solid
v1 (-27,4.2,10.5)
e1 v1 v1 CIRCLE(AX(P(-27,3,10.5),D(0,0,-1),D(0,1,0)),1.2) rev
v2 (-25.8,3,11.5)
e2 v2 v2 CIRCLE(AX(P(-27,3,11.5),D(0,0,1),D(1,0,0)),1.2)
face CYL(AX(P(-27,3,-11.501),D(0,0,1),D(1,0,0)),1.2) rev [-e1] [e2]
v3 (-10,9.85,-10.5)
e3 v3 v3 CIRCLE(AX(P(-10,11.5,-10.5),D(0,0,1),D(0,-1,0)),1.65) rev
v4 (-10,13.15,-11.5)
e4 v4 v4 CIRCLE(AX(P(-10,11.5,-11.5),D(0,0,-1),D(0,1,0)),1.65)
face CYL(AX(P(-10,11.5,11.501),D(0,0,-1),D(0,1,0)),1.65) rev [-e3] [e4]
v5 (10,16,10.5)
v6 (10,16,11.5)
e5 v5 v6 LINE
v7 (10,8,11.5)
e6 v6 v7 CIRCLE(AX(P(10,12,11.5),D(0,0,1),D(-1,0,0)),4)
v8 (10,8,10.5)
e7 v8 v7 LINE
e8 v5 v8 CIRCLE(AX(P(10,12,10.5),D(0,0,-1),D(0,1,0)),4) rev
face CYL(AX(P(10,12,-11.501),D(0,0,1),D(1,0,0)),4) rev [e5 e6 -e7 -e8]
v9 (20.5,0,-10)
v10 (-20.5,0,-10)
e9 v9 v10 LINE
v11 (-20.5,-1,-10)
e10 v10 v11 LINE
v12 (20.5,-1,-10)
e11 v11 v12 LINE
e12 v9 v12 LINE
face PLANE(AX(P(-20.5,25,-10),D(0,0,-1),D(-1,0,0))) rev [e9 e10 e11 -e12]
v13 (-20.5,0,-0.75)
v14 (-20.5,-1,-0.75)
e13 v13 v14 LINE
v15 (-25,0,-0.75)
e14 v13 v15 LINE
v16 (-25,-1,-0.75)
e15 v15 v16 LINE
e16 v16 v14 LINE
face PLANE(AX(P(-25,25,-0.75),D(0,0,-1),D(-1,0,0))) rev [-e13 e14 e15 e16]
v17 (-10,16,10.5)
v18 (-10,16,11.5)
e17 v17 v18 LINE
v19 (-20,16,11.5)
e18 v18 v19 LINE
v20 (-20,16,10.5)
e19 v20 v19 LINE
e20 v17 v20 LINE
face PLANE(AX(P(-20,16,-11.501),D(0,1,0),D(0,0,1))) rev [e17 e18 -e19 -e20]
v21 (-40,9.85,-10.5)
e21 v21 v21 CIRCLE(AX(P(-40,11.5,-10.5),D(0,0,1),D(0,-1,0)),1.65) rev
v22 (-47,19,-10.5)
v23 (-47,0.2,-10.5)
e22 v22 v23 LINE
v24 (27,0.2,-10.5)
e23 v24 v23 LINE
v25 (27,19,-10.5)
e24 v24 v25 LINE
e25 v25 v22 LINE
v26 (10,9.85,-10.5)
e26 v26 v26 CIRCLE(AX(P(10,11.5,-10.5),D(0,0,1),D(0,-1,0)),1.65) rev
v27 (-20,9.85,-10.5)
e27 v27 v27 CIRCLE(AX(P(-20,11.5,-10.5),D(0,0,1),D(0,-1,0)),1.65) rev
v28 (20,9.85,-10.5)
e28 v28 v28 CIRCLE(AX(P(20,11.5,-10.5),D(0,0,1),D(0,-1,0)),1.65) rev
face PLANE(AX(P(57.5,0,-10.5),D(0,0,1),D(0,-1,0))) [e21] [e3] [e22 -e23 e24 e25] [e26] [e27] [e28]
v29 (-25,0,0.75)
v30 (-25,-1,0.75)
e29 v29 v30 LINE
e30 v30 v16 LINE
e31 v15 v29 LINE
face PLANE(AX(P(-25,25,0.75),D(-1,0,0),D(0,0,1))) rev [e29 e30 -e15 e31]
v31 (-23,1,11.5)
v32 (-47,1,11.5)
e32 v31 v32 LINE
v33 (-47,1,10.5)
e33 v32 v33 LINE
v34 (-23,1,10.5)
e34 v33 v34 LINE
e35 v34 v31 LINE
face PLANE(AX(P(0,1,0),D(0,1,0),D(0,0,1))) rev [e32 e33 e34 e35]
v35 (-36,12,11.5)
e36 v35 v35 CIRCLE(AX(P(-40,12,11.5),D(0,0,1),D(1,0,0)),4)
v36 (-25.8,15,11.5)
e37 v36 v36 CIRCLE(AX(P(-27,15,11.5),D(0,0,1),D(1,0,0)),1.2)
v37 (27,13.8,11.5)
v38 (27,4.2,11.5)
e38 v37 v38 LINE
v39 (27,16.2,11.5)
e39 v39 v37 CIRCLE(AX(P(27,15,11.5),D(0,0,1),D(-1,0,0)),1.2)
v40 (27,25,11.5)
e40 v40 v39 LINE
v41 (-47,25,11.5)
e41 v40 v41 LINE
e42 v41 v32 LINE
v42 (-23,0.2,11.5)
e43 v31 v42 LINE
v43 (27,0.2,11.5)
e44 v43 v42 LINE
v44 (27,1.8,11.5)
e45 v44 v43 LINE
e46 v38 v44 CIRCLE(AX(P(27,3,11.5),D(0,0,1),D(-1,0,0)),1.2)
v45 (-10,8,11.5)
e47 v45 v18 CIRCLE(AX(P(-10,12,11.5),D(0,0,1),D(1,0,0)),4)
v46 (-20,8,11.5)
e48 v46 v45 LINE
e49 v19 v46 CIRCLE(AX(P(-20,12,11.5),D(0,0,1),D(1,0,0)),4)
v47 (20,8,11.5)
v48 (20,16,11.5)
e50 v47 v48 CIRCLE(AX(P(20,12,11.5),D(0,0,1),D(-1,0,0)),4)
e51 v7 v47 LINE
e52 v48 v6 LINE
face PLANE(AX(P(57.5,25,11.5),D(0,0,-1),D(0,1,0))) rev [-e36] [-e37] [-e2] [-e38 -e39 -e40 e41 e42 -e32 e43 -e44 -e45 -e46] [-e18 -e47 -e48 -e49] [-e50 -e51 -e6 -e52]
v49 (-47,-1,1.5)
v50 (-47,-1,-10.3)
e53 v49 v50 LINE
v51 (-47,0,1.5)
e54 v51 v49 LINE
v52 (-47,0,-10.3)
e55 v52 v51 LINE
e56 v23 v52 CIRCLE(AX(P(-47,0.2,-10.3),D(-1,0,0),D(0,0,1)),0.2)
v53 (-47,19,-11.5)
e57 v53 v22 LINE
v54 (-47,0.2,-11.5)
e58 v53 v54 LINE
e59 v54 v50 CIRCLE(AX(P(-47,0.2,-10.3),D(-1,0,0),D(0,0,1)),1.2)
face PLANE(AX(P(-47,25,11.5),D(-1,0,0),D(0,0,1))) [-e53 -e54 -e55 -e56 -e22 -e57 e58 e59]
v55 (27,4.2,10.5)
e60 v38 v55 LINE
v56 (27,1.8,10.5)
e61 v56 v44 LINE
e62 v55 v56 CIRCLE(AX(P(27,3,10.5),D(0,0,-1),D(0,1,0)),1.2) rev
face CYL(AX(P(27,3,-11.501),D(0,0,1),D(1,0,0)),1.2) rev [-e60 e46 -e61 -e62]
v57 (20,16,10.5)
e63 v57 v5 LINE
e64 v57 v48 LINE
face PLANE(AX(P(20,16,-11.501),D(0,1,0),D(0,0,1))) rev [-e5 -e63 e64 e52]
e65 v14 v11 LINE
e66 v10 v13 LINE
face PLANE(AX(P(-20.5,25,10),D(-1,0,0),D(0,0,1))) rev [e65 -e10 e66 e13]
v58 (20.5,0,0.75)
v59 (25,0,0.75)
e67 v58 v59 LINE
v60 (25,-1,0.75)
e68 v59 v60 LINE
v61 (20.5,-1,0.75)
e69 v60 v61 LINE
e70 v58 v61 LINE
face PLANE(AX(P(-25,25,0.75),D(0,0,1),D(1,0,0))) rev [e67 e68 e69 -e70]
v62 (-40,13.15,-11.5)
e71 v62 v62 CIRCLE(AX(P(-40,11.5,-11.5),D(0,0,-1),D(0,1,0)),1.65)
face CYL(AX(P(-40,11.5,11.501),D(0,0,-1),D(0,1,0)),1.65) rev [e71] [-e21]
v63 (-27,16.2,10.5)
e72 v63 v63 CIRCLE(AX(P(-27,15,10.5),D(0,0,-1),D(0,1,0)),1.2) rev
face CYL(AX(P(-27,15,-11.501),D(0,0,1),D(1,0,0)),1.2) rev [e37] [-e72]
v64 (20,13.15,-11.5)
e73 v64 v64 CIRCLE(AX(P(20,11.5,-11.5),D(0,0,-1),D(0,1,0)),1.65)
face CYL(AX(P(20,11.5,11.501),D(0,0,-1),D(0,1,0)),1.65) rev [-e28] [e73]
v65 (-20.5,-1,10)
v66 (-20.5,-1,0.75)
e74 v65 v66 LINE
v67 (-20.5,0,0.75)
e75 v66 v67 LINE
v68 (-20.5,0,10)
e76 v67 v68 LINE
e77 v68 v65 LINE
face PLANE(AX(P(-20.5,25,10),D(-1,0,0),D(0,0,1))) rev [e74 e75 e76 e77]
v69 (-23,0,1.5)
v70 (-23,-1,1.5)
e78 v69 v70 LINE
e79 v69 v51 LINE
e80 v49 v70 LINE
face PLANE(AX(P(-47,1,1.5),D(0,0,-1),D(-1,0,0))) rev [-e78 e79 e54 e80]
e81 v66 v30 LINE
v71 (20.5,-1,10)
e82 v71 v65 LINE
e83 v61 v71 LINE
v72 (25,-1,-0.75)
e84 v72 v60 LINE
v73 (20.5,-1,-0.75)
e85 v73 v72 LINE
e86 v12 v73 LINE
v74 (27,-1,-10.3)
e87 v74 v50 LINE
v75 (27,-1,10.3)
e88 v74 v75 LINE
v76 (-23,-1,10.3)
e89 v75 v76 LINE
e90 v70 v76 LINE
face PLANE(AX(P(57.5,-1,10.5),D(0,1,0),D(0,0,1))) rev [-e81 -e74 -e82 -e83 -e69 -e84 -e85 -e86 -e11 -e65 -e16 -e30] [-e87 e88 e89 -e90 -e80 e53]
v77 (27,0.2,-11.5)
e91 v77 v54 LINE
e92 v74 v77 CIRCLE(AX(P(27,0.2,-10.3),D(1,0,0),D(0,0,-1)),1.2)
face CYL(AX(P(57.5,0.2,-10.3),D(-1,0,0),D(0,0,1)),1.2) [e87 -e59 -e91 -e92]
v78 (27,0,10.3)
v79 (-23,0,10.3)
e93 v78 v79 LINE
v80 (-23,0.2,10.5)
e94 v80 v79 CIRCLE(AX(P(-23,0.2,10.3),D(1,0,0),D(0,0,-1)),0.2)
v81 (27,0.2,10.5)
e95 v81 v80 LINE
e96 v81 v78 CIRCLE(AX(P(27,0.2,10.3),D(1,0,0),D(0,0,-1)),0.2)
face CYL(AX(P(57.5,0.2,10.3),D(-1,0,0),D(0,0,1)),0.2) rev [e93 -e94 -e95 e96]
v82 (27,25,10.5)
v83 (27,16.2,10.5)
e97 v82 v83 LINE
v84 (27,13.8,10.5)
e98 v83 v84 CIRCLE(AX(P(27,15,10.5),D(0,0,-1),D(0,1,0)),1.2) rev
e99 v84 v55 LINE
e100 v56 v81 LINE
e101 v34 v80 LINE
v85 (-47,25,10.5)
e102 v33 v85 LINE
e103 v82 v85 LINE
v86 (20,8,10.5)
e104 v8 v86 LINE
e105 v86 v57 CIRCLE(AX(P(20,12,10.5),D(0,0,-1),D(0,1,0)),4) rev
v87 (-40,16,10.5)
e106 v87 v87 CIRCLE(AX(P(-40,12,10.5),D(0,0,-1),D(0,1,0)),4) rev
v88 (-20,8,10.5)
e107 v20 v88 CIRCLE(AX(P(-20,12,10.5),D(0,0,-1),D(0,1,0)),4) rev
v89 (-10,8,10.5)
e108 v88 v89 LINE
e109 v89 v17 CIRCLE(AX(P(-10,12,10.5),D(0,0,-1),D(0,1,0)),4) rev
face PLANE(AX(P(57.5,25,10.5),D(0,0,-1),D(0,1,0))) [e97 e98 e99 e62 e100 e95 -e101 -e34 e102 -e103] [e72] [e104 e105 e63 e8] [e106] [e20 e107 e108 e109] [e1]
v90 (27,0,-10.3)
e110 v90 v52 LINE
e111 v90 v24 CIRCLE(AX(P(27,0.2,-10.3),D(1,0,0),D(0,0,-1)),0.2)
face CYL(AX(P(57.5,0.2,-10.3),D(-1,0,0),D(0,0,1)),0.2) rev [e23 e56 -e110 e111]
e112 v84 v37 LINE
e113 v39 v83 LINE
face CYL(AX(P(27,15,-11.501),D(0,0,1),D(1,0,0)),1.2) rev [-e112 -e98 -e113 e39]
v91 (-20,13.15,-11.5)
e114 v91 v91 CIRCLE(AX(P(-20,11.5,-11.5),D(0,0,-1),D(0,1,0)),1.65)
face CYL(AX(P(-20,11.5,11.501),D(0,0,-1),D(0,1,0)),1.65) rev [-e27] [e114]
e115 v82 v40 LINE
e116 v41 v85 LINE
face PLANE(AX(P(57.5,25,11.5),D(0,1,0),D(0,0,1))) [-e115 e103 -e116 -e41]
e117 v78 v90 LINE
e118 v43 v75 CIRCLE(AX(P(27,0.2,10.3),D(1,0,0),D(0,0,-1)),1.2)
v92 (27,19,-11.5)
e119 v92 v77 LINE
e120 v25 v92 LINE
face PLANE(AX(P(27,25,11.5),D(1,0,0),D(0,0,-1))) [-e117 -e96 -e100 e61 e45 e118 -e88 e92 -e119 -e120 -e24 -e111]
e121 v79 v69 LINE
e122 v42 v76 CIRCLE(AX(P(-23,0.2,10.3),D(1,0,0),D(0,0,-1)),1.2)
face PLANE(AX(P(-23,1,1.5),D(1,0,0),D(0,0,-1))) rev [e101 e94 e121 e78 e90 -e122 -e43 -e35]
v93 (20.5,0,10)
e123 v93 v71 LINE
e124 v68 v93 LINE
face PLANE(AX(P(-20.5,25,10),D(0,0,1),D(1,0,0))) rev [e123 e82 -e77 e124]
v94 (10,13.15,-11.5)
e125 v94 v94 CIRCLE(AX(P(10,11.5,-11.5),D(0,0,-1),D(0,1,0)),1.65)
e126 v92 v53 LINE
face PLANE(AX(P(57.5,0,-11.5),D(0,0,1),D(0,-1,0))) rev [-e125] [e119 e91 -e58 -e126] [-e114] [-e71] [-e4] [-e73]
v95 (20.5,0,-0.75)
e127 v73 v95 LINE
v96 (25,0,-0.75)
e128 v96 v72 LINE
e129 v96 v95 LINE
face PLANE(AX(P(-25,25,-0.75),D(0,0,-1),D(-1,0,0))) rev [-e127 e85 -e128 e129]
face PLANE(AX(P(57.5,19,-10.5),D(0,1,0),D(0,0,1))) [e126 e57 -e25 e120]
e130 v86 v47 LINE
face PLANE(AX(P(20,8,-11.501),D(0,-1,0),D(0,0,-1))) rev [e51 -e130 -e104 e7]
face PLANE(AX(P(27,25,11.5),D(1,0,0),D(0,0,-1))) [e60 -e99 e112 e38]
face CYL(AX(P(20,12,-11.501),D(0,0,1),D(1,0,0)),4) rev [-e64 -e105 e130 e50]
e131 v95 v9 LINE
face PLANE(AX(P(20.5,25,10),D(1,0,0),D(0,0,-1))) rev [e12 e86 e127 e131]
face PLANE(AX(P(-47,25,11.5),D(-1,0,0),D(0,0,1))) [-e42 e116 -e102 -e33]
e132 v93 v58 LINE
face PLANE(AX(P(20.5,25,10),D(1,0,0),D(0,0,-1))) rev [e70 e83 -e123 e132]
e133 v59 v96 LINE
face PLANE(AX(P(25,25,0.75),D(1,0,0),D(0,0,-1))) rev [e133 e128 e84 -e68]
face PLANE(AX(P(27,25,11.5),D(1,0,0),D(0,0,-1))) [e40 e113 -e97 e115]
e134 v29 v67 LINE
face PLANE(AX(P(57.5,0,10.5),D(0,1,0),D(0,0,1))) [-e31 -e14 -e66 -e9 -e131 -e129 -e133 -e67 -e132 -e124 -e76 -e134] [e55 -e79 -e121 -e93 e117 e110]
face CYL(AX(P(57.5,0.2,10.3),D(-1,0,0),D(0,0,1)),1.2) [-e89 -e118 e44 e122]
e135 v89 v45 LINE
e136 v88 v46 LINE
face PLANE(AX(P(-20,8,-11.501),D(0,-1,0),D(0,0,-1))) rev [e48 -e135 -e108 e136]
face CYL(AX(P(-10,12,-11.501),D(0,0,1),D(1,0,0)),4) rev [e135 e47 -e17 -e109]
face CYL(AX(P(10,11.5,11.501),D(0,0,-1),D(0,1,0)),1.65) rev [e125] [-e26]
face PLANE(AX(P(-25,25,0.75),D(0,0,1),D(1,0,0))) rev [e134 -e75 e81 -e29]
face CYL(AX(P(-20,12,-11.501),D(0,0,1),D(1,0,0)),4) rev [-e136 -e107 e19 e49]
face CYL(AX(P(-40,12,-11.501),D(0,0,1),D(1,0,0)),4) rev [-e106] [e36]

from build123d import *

# Parameters (mm, degrees)
FESTPLATTENBLECH_SCHNITT_LINEAR_START        = -14.177516002
FESTPLATTENBLECH_SCHNITT_LINEAR_AU_2_W       = 115
FESTPLATTENBLECH_SCHNITT_LINEAR_AU_2_H       = 1
FESTPLATTENBLECH_SCHNITT_LINEAR_AUSTRA_DEPTH = 20.6
FESTPLATTENBLECH_SCHNITT_LINEAR_START_2      = 6.622483998
FESTPLATTENBLECH_SCHNITT_LINEAR_AU_3_O_W     = 115
FESTPLATTENBLECH_SCHNITT_LINEAR_AU_3_O_H     = 6
FESTPLATTENBLECH_SCHNITT_LINEAR_AU_3_DEPTH   = 1
FESTPLATTENBLECH_SCHNITT_LINEAR_START_3      = -15.377516002
FESTPLATTENBLECH_SCHNITT_LINEAR_AU_4_O_R     = 4
FESTPLATTENBLECH_SCHNITT_LINEAR_AU_4_O_R_2   = 1.65
FESTPLATTENBLECH_SCHNITT_LINEAR_AU_4_O_R_3   = 1.2
FESTPLATTENBLECH_SCHNITT_LINEAR_AU_4_DEPTH   = 1
FESTPLATTENBLECH_SCHNITT_LINEAR_START_4      = -59.8
FESTPLATTENBLECH_SCHNITT_LINEAR_AU_5_O_W     = 3
FESTPLATTENBLECH_SCHNITT_LINEAR_AU_5_O_H     = 1
FESTPLATTENBLECH_SCHNITT_LINEAR_AU_5_DEPTH   = 115
FESTPLATTENBLECH_SCHNITT_LINEAR_AU_6_O_W     = 8
FESTPLATTENBLECH_SCHNITT_LINEAR_AU_6_O_H     = 1
FESTPLATTENBLECH_SCHNITT_LINEAR_AU_6_DEPTH   = 37.5
FESTPLATTENBLECH_SCHNITT_LINEAR_START_5      = 17.7
FESTPLATTENBLECH_SCHNITT_LINEAR_AU_7_O_W     = 8
FESTPLATTENBLECH_SCHNITT_LINEAR_AU_7_O_H     = 1
FESTPLATTENBLECH_SCHNITT_LINEAR_AU_7_DEPTH   = 37.5
FESTPLATTENBLECH_SCHNITT_LINEAR_START_6      = -12.3
FESTPLATTENBLECH_SCHNITT_LINEAR_AU_8_O_W     = 8
FESTPLATTENBLECH_SCHNITT_LINEAR_AU_8_O_H     = 1
FESTPLATTENBLECH_SCHNITT_LINEAR_AU_8_DEPTH   = 20
FESTPLATTENBLECH_SCHNITT_LINEAR_AU_9_O_R     = 4
FESTPLATTENBLECH_SCHNITT_LINEAR_AU_9_O_R_2   = 1.2
FESTPLATTENBLECH_SCHNITT_LINEAR_AU_9_DEPTH   = 1
FESTPLATTENBLECH_SCHNITT_LINEAR_START_7      = -16
FESTPLATTENBLECH_SCHNITT_LINEAR_AU_11_R      = 1.65
FESTPLATTENBLECH_SCHNITT_LINEAR_AU_10_DEPTH  = 22.622483998
SKIZZE1_W                                    = 41
SKIZZE1_H                                    = 20
SCHNITT_LINEAR_AUSTRAGEN1_DEPTH              = 65.144368423
SKIZZE2_W                                    = 50
SKIZZE2_H                                    = 1.5
SCHNITT_LINEAR_AUSTRAGEN2_DEPTH              = 65.144368423
SKIZZE3_OUTSIDE_W                            = 141.024
SKIZZE3_OUTSIDE_H                            = 49.024
SKIZZE3_OUTSIDE_W_2                          = 74
SKIZZE3_OUTSIDE_H_2                          = 23
SCHNITT_LINEAR_AUSTRAGEN3_DEPTH              = 65.144368423
SKIZZE9_W                                    = 24
SKIZZE9_H                                    = 10
SCHNITT_LINEAR_AUSTRAGEN5_DEPTH              = 2


with BuildPart() as part:
    # <Festplattenblech>-<Schnitt-Linear austragen2>: read off the stored shape, not the designer's step
    # Festplattenblech_-_Schnitt-Linear au 2 → <Festplattenblech>-<Schnitt-Linear austragen2> (new body)
    with BuildSketch(Plane.XY.offset(FESTPLATTENBLECH_SCHNITT_LINEAR_START)):
        with Locations((-2.3, 1.027254306)):
            Rectangle(FESTPLATTENBLECH_SCHNITT_LINEAR_AU_2_W, FESTPLATTENBLECH_SCHNITT_LINEAR_AU_2_H)
    extrude(amount=FESTPLATTENBLECH_SCHNITT_LINEAR_AUSTRA_DEPTH)



with BuildPart() as body_2:
    # Festplattenblech_-_Schnitt-Linear au 3 o → Festplattenblech_-_Schnitt-Linear au 3 (new body)
    with BuildSketch(Plane.XY.offset(FESTPLATTENBLECH_SCHNITT_LINEAR_START_2)):
        with Locations((-2.3, 23.527254306)):
            Rectangle(FESTPLATTENBLECH_SCHNITT_LINEAR_AU_3_O_W, FESTPLATTENBLECH_SCHNITT_LINEAR_AU_3_O_H)
    extrude(amount=FESTPLATTENBLECH_SCHNITT_LINEAR_AU_3_DEPTH)


with BuildPart() as body_3:
    # Festplattenblech_-_Schnitt-Linear au 4 o → Festplattenblech_-_Schnitt-Linear au 4 (new body)
    # profile 1 of 12: a face of its own
    with BuildSketch(Plane.XY.offset(FESTPLATTENBLECH_SCHNITT_LINEAR_START_3)):
        with Locations((-42.3, 13.527254306)):
            Circle(FESTPLATTENBLECH_SCHNITT_LINEAR_AU_4_O_R)
        with Locations((-42.3, 13.027254306)):
            Circle(FESTPLATTENBLECH_SCHNITT_LINEAR_AU_4_O_R_2, mode=Mode.SUBTRACT)
    # profile 2 of 12: a face of its own
    with BuildSketch(Plane.XY.offset(FESTPLATTENBLECH_SCHNITT_LINEAR_START_3)):
        with BuildLine():
            ThreePointArc((-22.3, 17.527254306), (-26.3, 13.527254306), (-22.3, 9.527254306))
            Line((-22.3, 9.527254306), (-12.3, 9.527254306))
            ThreePointArc((-12.3, 9.527254306), (-8.3, 13.527254306), (-12.3, 17.527254306))
            Line((-12.3, 17.527254306), (-22.3, 17.527254306))
        make_face()
        with Locations((-22.3, 13.027254306)):
            Circle(FESTPLATTENBLECH_SCHNITT_LINEAR_AU_4_O_R_2, mode=Mode.SUBTRACT)
        with Locations((-12.3, 13.027254306)):
            Circle(FESTPLATTENBLECH_SCHNITT_LINEAR_AU_4_O_R_2, mode=Mode.SUBTRACT)
    # profile 3 of 12: a face of its own
    with BuildSketch(Plane.XY.offset(FESTPLATTENBLECH_SCHNITT_LINEAR_START_3)):
        with Locations((-55.3, 16.527254306)):
            Circle(FESTPLATTENBLECH_SCHNITT_LINEAR_AU_4_O_R_3)
    # profile 4 of 12: a face of its own
    with BuildSketch(Plane.XY.offset(FESTPLATTENBLECH_SCHNITT_LINEAR_START_3)):
        with Locations((-55.3, 4.527254306)):
            Circle(FESTPLATTENBLECH_SCHNITT_LINEAR_AU_4_O_R_3)
    # profile 5 of 12: a face of its own
    with BuildSketch(Plane.XY.offset(FESTPLATTENBLECH_SCHNITT_LINEAR_START_3)):
        with Locations((-29.3, 16.527254306)):
            Circle(FESTPLATTENBLECH_SCHNITT_LINEAR_AU_4_O_R_3)
    # profile 6 of 12: a face of its own
    with BuildSketch(Plane.XY.offset(FESTPLATTENBLECH_SCHNITT_LINEAR_START_3)):
        with Locations((-29.3, 4.527254306)):
            Circle(FESTPLATTENBLECH_SCHNITT_LINEAR_AU_4_O_R_3)
    # profile 7 of 12: a face of its own
    with BuildSketch(Plane.XY.offset(FESTPLATTENBLECH_SCHNITT_LINEAR_START_3)):
        with Locations((50.7, 4.527254306)):
            Circle(FESTPLATTENBLECH_SCHNITT_LINEAR_AU_4_O_R_3)
    # profile 8 of 12: a face of its own
    with BuildSketch(Plane.XY.offset(FESTPLATTENBLECH_SCHNITT_LINEAR_START_3)):
        with BuildLine():
            ThreePointArc((17.7, 9.527254306), (21.7, 13.527254306), (17.7, 17.527254306))
            Line((17.7, 17.527254306), (7.7, 17.527254306))
            ThreePointArc((7.7, 17.527254306), (3.7, 13.527254306), (7.7, 9.527254306))
            Line((7.7, 9.527254306), (17.7, 9.527254306))
        make_face()
        with Locations((7.7, 13.027254306)):
            Circle(FESTPLATTENBLECH_SCHNITT_LINEAR_AU_4_O_R_2, mode=Mode.SUBTRACT)
        with Locations((17.7, 13.027254306)):
            Circle(FESTPLATTENBLECH_SCHNITT_LINEAR_AU_4_O_R_2, mode=Mode.SUBTRACT)
    # profile 9 of 12: a face of its own
    with BuildSketch(Plane.XY.offset(FESTPLATTENBLECH_SCHNITT_LINEAR_START_3)):
        with Locations((24.7, 4.527254306)):
            Circle(FESTPLATTENBLECH_SCHNITT_LINEAR_AU_4_O_R_3)
    # profile 10 of 12: a face of its own
    with BuildSketch(Plane.XY.offset(FESTPLATTENBLECH_SCHNITT_LINEAR_START_3)):
        with Locations((24.7, 16.527254306)):
            Circle(FESTPLATTENBLECH_SCHNITT_LINEAR_AU_4_O_R_3)
    # profile 11 of 12: a face of its own
    with BuildSketch(Plane.XY.offset(FESTPLATTENBLECH_SCHNITT_LINEAR_START_3)):
        with Locations((37.7, 13.527254306)):
            Circle(FESTPLATTENBLECH_SCHNITT_LINEAR_AU_4_O_R)
        with Locations((37.7, 13.027254306)):
            Circle(FESTPLATTENBLECH_SCHNITT_LINEAR_AU_4_O_R_2, mode=Mode.SUBTRACT)
    # profile 12 of 12: a face of its own
    with BuildSketch(Plane.XY.offset(FESTPLATTENBLECH_SCHNITT_LINEAR_START_3)):
        with Locations((50.7, 16.527254306)):
            Circle(FESTPLATTENBLECH_SCHNITT_LINEAR_AU_4_O_R_3)
    extrude(amount=FESTPLATTENBLECH_SCHNITT_LINEAR_AU_4_DEPTH)


with BuildPart() as part_1:
    add(part.part)

    add(body_2.part)  # Festplattenblech_-_Schnitt-Linear au 5 merges body 2

    add(body_3.part)  # Festplattenblech_-_Schnitt-Linear au 5 merges body 3
    # Festplattenblech_-_Schnitt-Linear au 5 o → Festplattenblech_-_Schnitt-Linear au 5 (add)
    with BuildSketch(Plane.YZ.offset(FESTPLATTENBLECH_SCHNITT_LINEAR_START_4)):
        with Locations((19.027254306, -14.877516002)):
            Rectangle(FESTPLATTENBLECH_SCHNITT_LINEAR_AU_5_O_W, FESTPLATTENBLECH_SCHNITT_LINEAR_AU_5_O_H)
        with BuildLine():
            Line((1.727254306, -15.377516002), (9.527254306, -15.377516002))
            Line((9.527254306, -15.377516002), (9.527254306, -14.377516002))
            Line((9.527254306, -14.377516002), (1.727254306, -14.377516002))
            ThreePointArc((1.727254306, -14.377516002), (1.58583295, -14.318937358), (1.527254306, -14.177516002))
            Line((1.527254306, -14.177516002), (0.527254306, -14.177516002))
            ThreePointArc((0.527254306, -14.177516002), (0.878726169, -15.026044139), (1.727254306, -15.377516002))
        make_face()
        with BuildLine():
            Line((0.527254306, 6.422483998), (1.527254306, 6.422483998))
            ThreePointArc((1.527254306, 6.422483998), (1.58583295, 6.563905354), (1.727254306, 6.622483998))
            Line((1.727254306, 6.622483998), (9.527254306, 6.622483998))
            Line((9.527254306, 6.622483998), (9.527254306, 7.622483998))
            Line((9.527254306, 7.622483998), (1.727254306, 7.622483998))
            ThreePointArc((1.727254306, 7.622483998), (0.878726169, 7.271012135), (0.527254306, 6.422483998))
        make_face()
        with Locations((19.027254306, 7.122483998)):
            Rectangle(FESTPLATTENBLECH_SCHNITT_LINEAR_AU_5_O_W, FESTPLATTENBLECH_SCHNITT_LINEAR_AU_5_O_H)
    extrude(amount=FESTPLATTENBLECH_SCHNITT_LINEAR_AU_5_DEPTH)

    # Festplattenblech_-_Schnitt-Linear au 6 o → Festplattenblech_-_Schnitt-Linear au 6 (add)
    with BuildSketch(Plane.YZ.offset(FESTPLATTENBLECH_SCHNITT_LINEAR_START_4)):
        with Locations((13.527254306, -14.877516002)):
            Rectangle(FESTPLATTENBLECH_SCHNITT_LINEAR_AU_6_O_W, FESTPLATTENBLECH_SCHNITT_LINEAR_AU_6_O_H)
        with Locations((13.527254306, 7.122483998)):
            Rectangle(FESTPLATTENBLECH_SCHNITT_LINEAR_AU_6_O_W, FESTPLATTENBLECH_SCHNITT_LINEAR_AU_6_O_H)
    extrude(amount=FESTPLATTENBLECH_SCHNITT_LINEAR_AU_6_DEPTH)

    # Festplattenblech_-_Schnitt-Linear au 7 o → Festplattenblech_-_Schnitt-Linear au 7 (add)
    with BuildSketch(Plane.YZ.offset(FESTPLATTENBLECH_SCHNITT_LINEAR_START_5)):
        with Locations((13.527254306, -14.877516002)):
            Rectangle(FESTPLATTENBLECH_SCHNITT_LINEAR_AU_7_O_W, FESTPLATTENBLECH_SCHNITT_LINEAR_AU_7_O_H)
        with Locations((13.527254306, 7.122483998)):
            Rectangle(FESTPLATTENBLECH_SCHNITT_LINEAR_AU_7_O_W, FESTPLATTENBLECH_SCHNITT_LINEAR_AU_7_O_H)
    extrude(amount=FESTPLATTENBLECH_SCHNITT_LINEAR_AU_7_DEPTH)

    # Festplattenblech_-_Schnitt-Linear au 8 o → Festplattenblech_-_Schnitt-Linear au 8 (add)
    with BuildSketch(Plane.YZ.offset(FESTPLATTENBLECH_SCHNITT_LINEAR_START_6)):
        with Locations((13.527254306, -14.877516002)):
            Rectangle(FESTPLATTENBLECH_SCHNITT_LINEAR_AU_8_O_W, FESTPLATTENBLECH_SCHNITT_LINEAR_AU_8_O_H)
        with Locations((13.527254306, 7.122483998)):
            Rectangle(FESTPLATTENBLECH_SCHNITT_LINEAR_AU_8_O_W, FESTPLATTENBLECH_SCHNITT_LINEAR_AU_8_O_H)
    extrude(amount=FESTPLATTENBLECH_SCHNITT_LINEAR_AU_8_DEPTH)

    # Festplattenblech_-_Schnitt-Linear au 9 o → Festplattenblech_-_Schnitt-Linear au 9 (cut)
    with BuildSketch(Plane.XY.offset(FESTPLATTENBLECH_SCHNITT_LINEAR_START_2)):
        with Locations((-42.3, 13.527254306)):
            Circle(FESTPLATTENBLECH_SCHNITT_LINEAR_AU_9_O_R)
        with BuildLine():
            ThreePointArc((-12.3, 9.527254306), (-8.3, 13.527254306), (-12.3, 17.527254306))
            Line((-12.3, 17.527254306), (-12.3, 9.527254306))
        make_face()
        with BuildLine():
            ThreePointArc((-22.3, 17.527254306), (-26.3, 13.527254306), (-22.3, 9.527254306))
            Line((-22.3, 9.527254306), (-22.3, 17.527254306))
        make_face()
        with Locations((-55.3, 16.527254306)):
            Circle(FESTPLATTENBLECH_SCHNITT_LINEAR_AU_9_O_R_2)
        with Locations((-55.3, 4.527254306)):
            Circle(FESTPLATTENBLECH_SCHNITT_LINEAR_AU_9_O_R_2)
        with Locations((-29.3, 16.527254306)):
            Circle(FESTPLATTENBLECH_SCHNITT_LINEAR_AU_9_O_R_2)
        with Locations((-29.3, 4.527254306)):
            Circle(FESTPLATTENBLECH_SCHNITT_LINEAR_AU_9_O_R_2)
        with Locations((50.7, 4.527254306)):
            Circle(FESTPLATTENBLECH_SCHNITT_LINEAR_AU_9_O_R_2)
        with BuildLine():
            ThreePointArc((7.7, 17.527254306), (3.7, 13.527254306), (7.7, 9.527254306))
            Line((7.7, 9.527254306), (7.7, 17.527254306))
        make_face()
        with BuildLine():
            ThreePointArc((17.7, 9.527254306), (21.7, 13.527254306), (17.7, 17.527254306))
            Line((17.7, 17.527254306), (17.7, 9.527254306))
        make_face()
        with Locations((24.7, 4.527254306)):
            Circle(FESTPLATTENBLECH_SCHNITT_LINEAR_AU_9_O_R_2)
        with Locations((24.7, 16.527254306)):
            Circle(FESTPLATTENBLECH_SCHNITT_LINEAR_AU_9_O_R_2)
        with Locations((37.7, 13.527254306)):
            Circle(FESTPLATTENBLECH_SCHNITT_LINEAR_AU_9_O_R)
        with Locations((50.7, 16.527254306)):
            Circle(FESTPLATTENBLECH_SCHNITT_LINEAR_AU_9_O_R_2)
    extrude(amount=FESTPLATTENBLECH_SCHNITT_LINEAR_AU_9_DEPTH, mode=Mode.SUBTRACT)

    # Festplattenblech_-_Schnitt-Linear au 11 → Festplattenblech_-_Schnitt-Linear au 10 (cut)
    with BuildSketch(Plane.XY.offset(FESTPLATTENBLECH_SCHNITT_LINEAR_START_7)):
        with BuildLine():
            Line((-12.3, 14.677254306), (-12.3, 11.377254306))
            ThreePointArc((-12.3, 11.377254306), (-10.65, 13.027254306), (-12.3, 14.677254306))
        make_face()
        with BuildLine():
            Line((-22.3, 11.377254306), (-22.3, 14.677254306))
            ThreePointArc((-22.3, 14.677254306), (-23.95, 13.027254306), (-22.3, 11.377254306))
        make_face()
        with BuildLine():
            Line((7.7, 11.377254306), (7.7, 14.677254306))
            ThreePointArc((7.7, 14.677254306), (6.05, 13.027254306), (7.7, 11.377254306))
        make_face()
        with BuildLine():
            Line((17.7, 14.677254306), (17.7, 11.377254306))
            ThreePointArc((17.7, 11.377254306), (19.35, 13.027254306), (17.7, 14.677254306))
        make_face()
        with Locations((37.7, 13.027254306)):
            Circle(FESTPLATTENBLECH_SCHNITT_LINEAR_AU_11_R)
        with Locations((-42.3, 13.027254306)):
            Circle(FESTPLATTENBLECH_SCHNITT_LINEAR_AU_11_R)
    extrude(amount=FESTPLATTENBLECH_SCHNITT_LINEAR_AU_10_DEPTH, mode=Mode.SUBTRACT)


with BuildPart() as part_2:
    # Festplattenblech: read off the stored shape, not the designer's step
    # Festplattenblech: moved
    add(part_1.part.moved(Location((2.3, -1.5272543, 3.877516))))

    # Skizze1 → Schnitt-Linear austragen1 (cut, through all)
    with BuildSketch(Plane.XZ.offset(1)):
        Rectangle(SKIZZE1_W, SKIZZE1_H)
    extrude(amount=-SCHNITT_LINEAR_AUSTRAGEN1_DEPTH, mode=Mode.SUBTRACT)

    # Skizze2 → Schnitt-Linear austragen2 (cut, through all)
    with BuildSketch(Plane.XZ.offset(1)):
        Rectangle(SKIZZE2_W, SKIZZE2_H)
    extrude(amount=-SCHNITT_LINEAR_AUSTRAGEN2_DEPTH, mode=Mode.SUBTRACT)

    # Skizze3 outside → Schnitt-Linear austragen3 (cut, through all)
    with BuildSketch(Plane.XZ.offset(1)):
        Rectangle(SKIZZE3_OUTSIDE_W, SKIZZE3_OUTSIDE_H)
        with Locations((-10, 0)):
            Rectangle(SKIZZE3_OUTSIDE_W_2, SKIZZE3_OUTSIDE_H_2, mode=Mode.SUBTRACT)
    extrude(amount=-SCHNITT_LINEAR_AUSTRAGEN3_DEPTH, mode=Mode.SUBTRACT)

    # Skizze9 → Schnitt-Linear austragen5 (cut)
    with BuildSketch(Plane.XZ.offset(1)):
        with Locations((-35, 6.5)):
            Rectangle(SKIZZE9_W, SKIZZE9_H)
    extrude(amount=-SCHNITT_LINEAR_AUSTRAGEN5_DEPTH, mode=Mode.SUBTRACT)


solid = part_2.part
